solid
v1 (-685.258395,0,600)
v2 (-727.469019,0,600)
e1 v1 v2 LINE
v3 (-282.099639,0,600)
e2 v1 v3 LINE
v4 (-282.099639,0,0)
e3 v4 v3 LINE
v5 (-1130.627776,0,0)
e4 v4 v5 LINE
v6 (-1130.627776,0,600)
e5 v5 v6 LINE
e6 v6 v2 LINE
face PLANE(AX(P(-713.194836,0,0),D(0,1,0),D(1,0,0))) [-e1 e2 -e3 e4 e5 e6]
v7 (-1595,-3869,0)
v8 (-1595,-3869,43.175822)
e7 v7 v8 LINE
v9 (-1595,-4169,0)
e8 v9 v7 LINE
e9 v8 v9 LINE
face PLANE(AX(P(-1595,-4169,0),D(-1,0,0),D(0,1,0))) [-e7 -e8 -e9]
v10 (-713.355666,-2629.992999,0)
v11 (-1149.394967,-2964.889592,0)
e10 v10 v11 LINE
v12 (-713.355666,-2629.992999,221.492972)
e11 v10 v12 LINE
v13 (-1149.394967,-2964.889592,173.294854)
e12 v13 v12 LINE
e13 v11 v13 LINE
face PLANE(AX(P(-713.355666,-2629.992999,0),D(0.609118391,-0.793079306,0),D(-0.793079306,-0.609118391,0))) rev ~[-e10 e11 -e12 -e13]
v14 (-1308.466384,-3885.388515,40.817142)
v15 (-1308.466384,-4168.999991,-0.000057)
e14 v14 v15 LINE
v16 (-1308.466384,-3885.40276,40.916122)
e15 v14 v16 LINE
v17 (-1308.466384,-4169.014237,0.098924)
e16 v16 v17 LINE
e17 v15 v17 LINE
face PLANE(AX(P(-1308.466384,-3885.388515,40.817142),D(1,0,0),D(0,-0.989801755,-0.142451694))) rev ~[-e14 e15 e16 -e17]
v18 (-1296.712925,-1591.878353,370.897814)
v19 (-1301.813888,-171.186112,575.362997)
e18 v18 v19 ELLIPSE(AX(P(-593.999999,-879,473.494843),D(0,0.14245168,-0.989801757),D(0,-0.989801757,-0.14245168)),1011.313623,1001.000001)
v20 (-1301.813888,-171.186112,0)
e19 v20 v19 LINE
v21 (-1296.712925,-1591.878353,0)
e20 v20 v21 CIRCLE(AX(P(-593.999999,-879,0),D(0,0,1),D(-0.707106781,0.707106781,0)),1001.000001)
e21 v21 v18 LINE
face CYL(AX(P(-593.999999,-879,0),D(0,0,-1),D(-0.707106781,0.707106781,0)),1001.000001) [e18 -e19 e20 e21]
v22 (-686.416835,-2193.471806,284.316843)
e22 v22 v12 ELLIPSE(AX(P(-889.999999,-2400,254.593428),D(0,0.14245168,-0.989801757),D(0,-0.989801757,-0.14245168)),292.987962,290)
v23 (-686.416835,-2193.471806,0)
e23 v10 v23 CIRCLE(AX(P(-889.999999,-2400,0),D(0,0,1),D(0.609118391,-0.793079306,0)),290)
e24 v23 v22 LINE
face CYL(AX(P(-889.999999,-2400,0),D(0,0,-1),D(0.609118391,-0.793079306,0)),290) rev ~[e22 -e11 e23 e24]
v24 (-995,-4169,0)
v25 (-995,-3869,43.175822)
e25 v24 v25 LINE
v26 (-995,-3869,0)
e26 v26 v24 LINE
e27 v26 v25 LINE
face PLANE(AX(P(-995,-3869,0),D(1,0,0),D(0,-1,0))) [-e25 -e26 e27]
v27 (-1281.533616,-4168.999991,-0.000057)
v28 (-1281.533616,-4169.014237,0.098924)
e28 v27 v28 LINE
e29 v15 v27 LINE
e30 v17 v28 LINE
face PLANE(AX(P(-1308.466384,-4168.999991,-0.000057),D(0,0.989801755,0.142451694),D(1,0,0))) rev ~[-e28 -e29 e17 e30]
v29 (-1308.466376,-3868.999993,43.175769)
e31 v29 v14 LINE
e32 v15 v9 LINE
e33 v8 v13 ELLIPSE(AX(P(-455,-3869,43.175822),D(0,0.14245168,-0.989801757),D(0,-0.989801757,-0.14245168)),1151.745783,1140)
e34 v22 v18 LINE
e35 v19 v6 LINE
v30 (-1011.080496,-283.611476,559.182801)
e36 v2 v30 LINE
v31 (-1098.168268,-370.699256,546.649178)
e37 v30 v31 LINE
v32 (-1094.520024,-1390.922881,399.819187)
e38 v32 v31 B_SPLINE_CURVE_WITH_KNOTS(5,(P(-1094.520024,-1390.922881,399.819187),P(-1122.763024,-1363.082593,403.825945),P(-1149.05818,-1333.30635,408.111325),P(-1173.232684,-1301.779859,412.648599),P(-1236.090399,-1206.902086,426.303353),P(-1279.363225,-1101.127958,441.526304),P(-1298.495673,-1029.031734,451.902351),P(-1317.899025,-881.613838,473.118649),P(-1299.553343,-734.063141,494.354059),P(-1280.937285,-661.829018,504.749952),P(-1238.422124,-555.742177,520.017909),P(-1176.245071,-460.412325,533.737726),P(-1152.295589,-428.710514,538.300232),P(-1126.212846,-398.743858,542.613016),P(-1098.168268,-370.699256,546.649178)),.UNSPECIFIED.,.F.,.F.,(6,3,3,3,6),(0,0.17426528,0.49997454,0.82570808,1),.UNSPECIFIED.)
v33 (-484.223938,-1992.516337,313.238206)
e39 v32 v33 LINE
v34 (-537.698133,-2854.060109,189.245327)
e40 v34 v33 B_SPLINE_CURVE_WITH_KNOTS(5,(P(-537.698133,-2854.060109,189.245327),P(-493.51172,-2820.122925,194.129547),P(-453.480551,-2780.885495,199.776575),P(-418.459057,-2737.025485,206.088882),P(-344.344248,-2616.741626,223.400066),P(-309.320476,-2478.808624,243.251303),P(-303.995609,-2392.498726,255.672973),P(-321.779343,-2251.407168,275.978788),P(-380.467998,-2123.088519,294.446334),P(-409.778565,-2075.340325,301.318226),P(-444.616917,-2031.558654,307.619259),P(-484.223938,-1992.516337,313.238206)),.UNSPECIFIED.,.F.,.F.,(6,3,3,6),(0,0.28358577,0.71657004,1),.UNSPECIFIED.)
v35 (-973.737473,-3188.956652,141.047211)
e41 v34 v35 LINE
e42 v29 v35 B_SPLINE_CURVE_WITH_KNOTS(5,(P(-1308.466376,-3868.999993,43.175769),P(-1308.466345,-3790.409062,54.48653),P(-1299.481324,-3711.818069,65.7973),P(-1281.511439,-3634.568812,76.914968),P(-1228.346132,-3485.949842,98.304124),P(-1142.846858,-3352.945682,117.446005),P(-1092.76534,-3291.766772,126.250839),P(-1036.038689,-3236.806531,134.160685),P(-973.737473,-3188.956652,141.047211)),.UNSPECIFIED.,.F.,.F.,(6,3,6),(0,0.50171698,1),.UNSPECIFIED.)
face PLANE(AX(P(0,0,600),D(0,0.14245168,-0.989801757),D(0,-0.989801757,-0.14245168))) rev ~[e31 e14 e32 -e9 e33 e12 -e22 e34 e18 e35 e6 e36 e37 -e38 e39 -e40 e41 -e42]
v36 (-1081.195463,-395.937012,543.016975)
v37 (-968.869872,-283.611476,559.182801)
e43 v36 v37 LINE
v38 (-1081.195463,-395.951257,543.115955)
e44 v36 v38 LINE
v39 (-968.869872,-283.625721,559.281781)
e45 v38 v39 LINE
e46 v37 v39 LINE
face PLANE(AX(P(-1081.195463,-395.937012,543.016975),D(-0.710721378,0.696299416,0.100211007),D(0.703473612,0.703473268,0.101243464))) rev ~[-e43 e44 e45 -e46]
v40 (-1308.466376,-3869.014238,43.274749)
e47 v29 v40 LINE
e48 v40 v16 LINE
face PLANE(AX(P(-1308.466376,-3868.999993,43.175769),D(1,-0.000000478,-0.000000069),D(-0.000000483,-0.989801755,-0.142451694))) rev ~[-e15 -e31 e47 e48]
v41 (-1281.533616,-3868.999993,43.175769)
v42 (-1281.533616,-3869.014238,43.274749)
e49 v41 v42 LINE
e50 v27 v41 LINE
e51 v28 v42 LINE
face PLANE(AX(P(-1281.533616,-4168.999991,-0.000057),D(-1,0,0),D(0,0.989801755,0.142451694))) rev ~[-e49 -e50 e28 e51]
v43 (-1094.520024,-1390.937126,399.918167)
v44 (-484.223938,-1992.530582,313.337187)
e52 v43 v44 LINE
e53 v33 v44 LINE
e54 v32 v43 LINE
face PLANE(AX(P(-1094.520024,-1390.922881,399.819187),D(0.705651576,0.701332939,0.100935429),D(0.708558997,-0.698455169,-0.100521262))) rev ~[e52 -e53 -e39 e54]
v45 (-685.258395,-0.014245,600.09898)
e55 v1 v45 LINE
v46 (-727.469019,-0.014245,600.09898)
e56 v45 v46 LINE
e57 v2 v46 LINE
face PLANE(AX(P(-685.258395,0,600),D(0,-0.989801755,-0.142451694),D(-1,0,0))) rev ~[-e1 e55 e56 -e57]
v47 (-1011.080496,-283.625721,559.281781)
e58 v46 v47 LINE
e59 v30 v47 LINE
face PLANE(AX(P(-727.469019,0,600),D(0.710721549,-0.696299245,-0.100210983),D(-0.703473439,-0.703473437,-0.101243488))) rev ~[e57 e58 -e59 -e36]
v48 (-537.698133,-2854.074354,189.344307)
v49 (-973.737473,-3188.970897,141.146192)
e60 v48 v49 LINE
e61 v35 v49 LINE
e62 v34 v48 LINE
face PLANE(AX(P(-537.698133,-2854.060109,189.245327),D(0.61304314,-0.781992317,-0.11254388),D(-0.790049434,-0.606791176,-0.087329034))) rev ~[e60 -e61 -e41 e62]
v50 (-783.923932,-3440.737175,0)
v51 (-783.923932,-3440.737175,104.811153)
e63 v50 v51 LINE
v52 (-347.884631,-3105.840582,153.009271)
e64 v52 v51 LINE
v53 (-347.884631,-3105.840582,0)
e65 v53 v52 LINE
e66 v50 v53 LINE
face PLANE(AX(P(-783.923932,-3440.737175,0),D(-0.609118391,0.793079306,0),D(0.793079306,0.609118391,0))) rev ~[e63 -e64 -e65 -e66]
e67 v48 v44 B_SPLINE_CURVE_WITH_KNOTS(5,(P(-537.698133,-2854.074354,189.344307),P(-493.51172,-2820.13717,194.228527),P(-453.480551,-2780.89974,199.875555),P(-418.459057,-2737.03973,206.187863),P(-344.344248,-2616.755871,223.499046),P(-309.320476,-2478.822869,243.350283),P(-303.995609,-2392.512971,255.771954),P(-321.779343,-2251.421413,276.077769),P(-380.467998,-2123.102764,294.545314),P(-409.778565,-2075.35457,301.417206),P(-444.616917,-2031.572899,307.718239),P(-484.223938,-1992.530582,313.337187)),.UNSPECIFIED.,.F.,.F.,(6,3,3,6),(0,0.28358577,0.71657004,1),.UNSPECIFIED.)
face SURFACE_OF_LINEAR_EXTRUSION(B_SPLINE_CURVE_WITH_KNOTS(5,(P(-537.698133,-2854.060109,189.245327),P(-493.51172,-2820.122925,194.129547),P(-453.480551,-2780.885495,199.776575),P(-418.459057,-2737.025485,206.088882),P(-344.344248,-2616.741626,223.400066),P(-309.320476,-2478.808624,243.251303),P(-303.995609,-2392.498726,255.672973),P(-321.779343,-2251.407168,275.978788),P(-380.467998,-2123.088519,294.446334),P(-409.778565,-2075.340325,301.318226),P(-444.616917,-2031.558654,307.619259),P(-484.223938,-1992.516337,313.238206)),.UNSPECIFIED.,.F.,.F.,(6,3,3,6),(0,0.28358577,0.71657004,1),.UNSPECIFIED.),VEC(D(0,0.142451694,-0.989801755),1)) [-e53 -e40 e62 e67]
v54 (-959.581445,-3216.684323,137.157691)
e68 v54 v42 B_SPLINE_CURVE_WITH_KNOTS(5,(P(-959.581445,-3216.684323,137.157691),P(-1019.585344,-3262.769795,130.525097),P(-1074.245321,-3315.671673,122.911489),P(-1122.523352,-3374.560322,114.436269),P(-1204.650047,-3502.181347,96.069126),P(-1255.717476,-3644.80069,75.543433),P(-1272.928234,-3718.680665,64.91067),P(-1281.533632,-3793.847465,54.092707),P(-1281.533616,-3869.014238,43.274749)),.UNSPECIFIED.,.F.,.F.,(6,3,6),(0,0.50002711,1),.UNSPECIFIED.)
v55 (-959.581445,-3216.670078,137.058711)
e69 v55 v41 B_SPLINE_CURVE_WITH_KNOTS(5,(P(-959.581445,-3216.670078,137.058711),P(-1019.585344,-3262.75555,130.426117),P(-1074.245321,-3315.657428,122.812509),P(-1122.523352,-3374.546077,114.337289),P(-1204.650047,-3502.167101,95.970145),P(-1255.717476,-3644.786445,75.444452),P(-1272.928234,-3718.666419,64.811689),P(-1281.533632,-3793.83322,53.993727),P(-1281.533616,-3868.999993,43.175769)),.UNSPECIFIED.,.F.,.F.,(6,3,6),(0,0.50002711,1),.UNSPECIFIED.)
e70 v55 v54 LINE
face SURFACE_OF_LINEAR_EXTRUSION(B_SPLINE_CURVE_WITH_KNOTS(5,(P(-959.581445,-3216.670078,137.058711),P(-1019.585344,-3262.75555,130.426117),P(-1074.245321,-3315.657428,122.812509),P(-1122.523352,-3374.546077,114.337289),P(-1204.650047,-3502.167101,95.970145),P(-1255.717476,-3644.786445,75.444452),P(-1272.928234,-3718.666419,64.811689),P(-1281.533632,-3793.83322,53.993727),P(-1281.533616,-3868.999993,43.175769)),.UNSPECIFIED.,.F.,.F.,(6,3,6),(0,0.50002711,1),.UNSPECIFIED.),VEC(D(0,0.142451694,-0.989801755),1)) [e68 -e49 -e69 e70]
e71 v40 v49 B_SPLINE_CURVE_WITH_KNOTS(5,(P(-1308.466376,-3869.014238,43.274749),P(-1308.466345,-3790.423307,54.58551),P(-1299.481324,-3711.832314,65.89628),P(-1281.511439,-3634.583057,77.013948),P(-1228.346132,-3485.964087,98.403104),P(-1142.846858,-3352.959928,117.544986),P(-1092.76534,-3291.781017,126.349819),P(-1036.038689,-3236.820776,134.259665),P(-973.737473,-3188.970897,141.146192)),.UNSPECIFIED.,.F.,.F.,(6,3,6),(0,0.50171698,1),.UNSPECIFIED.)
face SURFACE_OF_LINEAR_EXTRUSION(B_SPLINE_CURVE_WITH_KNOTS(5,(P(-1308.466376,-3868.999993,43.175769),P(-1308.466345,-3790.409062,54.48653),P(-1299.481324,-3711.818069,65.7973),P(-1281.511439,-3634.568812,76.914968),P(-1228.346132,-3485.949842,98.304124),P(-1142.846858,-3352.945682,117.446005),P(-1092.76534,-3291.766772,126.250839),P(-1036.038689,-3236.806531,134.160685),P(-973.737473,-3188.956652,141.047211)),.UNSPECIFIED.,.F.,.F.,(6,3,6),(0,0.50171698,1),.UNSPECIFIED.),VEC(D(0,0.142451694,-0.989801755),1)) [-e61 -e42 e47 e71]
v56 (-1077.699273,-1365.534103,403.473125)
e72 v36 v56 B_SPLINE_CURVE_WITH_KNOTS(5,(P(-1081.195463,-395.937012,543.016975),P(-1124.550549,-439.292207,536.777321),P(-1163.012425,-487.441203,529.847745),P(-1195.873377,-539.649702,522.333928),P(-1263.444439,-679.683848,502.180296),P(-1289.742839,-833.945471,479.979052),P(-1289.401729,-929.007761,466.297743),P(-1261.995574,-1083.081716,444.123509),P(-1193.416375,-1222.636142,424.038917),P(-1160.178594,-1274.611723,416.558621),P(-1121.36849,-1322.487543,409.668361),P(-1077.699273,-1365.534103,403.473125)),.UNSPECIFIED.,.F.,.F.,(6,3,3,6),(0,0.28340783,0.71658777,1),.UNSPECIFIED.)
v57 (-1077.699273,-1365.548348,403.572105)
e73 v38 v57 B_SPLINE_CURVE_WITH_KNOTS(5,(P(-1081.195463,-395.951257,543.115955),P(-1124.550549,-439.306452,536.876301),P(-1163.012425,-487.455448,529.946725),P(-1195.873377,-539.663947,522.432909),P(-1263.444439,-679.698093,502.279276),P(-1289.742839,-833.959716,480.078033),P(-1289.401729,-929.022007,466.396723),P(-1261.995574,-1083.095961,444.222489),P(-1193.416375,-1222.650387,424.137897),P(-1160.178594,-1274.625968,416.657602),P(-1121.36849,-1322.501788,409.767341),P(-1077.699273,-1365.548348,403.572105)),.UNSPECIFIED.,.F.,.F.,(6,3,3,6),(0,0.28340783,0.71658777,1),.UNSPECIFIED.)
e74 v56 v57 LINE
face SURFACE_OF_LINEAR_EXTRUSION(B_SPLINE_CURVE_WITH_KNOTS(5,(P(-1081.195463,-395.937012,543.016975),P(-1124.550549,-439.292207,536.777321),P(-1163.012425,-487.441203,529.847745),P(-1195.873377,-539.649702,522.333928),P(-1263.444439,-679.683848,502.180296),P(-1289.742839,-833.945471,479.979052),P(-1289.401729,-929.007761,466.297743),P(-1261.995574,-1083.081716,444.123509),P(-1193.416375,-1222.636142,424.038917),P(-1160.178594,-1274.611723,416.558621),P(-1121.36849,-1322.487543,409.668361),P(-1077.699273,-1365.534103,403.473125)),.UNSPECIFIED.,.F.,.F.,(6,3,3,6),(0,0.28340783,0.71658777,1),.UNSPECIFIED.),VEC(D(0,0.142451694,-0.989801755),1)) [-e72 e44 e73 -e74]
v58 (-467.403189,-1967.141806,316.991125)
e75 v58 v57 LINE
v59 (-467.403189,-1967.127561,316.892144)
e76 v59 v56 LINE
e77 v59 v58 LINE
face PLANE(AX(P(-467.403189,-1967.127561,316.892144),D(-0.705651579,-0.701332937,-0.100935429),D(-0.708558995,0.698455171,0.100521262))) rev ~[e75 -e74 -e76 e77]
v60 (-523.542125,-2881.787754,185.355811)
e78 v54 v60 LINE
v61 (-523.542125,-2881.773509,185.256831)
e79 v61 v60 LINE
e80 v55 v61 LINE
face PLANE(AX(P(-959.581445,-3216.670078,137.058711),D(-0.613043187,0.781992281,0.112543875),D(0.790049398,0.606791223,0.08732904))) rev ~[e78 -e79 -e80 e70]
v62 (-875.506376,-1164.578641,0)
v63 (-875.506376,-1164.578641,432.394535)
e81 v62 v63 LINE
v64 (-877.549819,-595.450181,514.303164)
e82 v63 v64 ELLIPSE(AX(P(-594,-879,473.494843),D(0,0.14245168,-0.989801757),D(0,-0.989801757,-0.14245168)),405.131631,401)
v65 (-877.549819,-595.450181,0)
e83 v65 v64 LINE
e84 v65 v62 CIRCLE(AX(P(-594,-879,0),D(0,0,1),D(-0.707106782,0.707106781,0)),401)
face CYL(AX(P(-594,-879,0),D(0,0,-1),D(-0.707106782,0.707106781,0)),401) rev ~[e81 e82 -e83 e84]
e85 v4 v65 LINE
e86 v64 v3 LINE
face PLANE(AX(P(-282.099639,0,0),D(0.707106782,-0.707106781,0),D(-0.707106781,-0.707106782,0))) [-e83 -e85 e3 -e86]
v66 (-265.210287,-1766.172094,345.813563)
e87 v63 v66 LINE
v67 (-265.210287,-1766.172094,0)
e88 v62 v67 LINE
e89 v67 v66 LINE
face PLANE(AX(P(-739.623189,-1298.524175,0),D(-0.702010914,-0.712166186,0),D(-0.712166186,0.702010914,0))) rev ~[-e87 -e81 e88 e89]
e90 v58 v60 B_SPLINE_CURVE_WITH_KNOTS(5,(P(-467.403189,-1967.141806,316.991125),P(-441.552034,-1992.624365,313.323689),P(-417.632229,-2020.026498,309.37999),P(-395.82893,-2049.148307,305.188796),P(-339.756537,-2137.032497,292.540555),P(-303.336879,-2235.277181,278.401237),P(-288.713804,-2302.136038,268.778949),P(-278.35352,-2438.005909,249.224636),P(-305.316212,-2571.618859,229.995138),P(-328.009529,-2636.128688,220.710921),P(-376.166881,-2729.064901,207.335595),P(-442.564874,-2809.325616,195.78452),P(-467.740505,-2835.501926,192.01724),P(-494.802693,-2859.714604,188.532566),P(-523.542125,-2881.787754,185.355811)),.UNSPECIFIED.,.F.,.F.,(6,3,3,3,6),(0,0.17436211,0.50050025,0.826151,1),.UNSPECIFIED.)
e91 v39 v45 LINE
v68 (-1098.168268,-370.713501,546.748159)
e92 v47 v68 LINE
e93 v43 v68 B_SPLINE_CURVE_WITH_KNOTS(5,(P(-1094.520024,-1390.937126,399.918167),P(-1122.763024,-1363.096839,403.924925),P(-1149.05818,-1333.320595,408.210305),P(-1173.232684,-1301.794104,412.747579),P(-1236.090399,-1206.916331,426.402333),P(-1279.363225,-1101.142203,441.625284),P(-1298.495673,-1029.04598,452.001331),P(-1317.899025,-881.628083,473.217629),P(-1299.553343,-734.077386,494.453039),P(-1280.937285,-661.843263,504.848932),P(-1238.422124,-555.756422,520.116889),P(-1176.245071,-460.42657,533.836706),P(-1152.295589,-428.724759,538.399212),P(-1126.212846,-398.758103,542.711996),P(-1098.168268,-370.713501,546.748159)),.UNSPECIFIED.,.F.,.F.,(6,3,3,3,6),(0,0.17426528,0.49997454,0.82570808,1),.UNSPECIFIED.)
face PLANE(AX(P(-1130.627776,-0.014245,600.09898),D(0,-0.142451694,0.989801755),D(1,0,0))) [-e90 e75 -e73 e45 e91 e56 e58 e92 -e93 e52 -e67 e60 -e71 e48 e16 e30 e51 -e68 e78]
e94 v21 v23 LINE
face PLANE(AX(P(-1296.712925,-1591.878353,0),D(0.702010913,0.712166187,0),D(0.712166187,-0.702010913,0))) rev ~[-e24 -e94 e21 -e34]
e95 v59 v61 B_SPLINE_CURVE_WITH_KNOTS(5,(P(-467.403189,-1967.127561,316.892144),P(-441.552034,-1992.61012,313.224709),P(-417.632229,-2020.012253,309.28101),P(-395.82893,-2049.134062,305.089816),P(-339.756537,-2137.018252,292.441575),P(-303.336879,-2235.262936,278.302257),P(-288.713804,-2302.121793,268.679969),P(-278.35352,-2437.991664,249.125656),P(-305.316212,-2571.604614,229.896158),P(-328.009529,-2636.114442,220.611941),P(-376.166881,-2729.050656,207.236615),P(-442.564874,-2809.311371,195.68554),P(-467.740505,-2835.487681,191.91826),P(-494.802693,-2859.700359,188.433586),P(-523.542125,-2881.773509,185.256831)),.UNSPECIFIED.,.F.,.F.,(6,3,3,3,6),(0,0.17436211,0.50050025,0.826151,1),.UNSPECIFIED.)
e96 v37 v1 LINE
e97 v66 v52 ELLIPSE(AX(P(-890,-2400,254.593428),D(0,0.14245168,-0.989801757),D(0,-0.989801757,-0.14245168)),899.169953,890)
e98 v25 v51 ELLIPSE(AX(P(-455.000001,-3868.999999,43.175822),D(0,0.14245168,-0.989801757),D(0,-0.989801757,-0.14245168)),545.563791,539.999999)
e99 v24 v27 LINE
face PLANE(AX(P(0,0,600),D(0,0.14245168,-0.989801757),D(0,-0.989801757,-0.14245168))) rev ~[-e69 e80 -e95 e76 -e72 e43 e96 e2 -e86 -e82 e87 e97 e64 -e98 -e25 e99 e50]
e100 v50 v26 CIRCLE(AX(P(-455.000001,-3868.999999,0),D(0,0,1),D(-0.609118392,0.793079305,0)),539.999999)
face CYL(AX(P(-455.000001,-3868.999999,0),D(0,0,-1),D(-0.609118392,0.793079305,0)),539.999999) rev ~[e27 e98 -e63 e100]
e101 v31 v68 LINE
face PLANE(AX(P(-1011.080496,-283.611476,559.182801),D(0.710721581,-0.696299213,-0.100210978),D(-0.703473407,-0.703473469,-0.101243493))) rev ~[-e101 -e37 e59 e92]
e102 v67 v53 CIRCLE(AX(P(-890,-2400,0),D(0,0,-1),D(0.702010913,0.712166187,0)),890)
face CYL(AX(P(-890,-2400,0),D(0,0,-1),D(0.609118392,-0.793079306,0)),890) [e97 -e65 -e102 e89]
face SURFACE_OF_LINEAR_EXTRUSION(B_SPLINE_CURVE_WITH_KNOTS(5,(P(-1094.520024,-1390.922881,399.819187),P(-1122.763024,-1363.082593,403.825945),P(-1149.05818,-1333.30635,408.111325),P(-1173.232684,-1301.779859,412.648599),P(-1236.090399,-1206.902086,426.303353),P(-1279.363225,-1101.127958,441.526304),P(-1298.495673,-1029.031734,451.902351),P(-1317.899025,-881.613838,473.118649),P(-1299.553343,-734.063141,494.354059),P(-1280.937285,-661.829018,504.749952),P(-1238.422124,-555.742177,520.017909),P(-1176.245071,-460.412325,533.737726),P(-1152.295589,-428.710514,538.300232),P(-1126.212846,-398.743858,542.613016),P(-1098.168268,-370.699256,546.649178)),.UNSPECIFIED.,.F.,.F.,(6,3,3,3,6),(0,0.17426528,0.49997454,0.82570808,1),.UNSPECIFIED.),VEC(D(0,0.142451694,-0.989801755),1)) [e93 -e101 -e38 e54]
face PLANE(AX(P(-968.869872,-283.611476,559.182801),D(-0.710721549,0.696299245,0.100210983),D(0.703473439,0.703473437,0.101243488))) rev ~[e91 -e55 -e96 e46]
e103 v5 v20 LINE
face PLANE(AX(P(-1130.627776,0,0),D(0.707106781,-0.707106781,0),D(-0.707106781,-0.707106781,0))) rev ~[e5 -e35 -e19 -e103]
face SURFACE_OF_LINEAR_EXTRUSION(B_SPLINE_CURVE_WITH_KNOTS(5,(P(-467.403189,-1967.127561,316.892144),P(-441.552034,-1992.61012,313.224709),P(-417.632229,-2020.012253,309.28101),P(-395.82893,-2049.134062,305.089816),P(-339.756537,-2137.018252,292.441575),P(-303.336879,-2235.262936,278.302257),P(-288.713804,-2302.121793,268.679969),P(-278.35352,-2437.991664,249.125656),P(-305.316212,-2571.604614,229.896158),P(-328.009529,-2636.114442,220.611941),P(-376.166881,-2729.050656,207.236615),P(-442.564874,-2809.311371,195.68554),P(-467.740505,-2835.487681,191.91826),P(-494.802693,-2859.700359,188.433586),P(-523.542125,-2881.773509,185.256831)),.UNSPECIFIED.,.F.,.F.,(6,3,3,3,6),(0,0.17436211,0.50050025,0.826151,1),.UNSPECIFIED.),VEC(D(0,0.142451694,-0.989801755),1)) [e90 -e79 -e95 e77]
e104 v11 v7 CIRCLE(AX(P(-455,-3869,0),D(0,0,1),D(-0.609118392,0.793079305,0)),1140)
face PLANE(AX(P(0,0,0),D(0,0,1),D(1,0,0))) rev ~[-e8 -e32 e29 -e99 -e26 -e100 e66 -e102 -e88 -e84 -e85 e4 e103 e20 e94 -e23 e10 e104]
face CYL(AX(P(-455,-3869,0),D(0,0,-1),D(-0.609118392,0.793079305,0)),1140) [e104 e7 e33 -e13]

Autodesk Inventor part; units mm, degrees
ref_plane "YZ Plane" through (0, 0, 0) normal (1, 0, 0) x (0, 1, 0)
ref_plane "XZ Plane" through (0, 0, 0) normal (0, 1, 0) x (-1, 0, 0)
ref_plane "XY Plane" through (0, 0, 0) normal (0, 0, 1) x (1, 0, 0)
sketch "スケッチ1" plane through (0, 0, 0) normal (0, 0, 1) x (1, 0, 0)
  line L0 (1130.627776, 0) -> (1301.813888, -171.186112)
  line L1 (282.099639, 0) -> (877.549819, -595.450181)
  line L2 (1130.627776, 0) -> (282.099639, 0)
  circle A0 centre (594, -879) radius 1001 construction
  arc A1 (1296.712925, -1591.878353) -> (1296.712925, -1591.878353) centre (389.934597, -671.982591) ccw
  line L3 (1296.712925, -1591.878353) -> (686.416835, -2193.471806)
  circle A2 centre (890, -2400) radius 290 construction
  line L4 (713.355666, -2629.992999) -> (1149.394967, -2964.889592)
  line L5 (1595, -4169) -> (1595, -3869)
  circle A3 centre (455, -3869) radius 1140 construction
  arc A4 (875.506376, -1164.578641) -> (877.549819, -595.450181) centre (594, -879) ccw construction
  circle A5 centre (890, -2400) radius 890 construction
  circle A6 centre (455, -3869) radius 540 construction
  line L6 (783.923932, -3440.737175) -> (347.884631, -3105.840582)
  line L7 (265.210287, -1766.172094) -> (875.506376, -1164.578641)
  line L8 (995, -3869) -> (995, -4169)
  line L9 (995, -4169) -> (1595, -4169)
  arc A7 (1296.712925, -1591.878353) -> (1301.813888, -171.186112) centre (594, -879) ccw
  arc A8 (265.210287, -1766.172094) -> (347.884631, -3105.840582) centre (890, -2400) ccw
  arc A9 (686.416835, -2193.471806) -> (713.355666, -2629.992999) centre (890, -2400) ccw
  arc A10 (875.506376, -1164.578641) -> (877.549819, -595.450181) centre (594, -879) ccw
  arc A11 (995, -3869) -> (783.923932, -3440.737175) centre (455, -3869) ccw
  arc A12 (1595, -3869) -> (1149.394967, -2964.889592) centre (455, -3869) ccw
  line L10 (0, -4169) -> (1595, -4169) construction
  line L11 (1595, -4169) -> (1595, -4131.300846) construction
  line L12 (0, -4169) -> (0, 0) construction
  line L13 (0, 0) -> (1595, 0) construction
  line L14 (-1130.627776, 0) -> (-1301.813888, -171.186112)
  line L15 (-282.099639, 0) -> (-877.549819, -595.450181)
  line L16 (-1130.627776, 0) -> (-282.099639, 0)
  arc A13 (-1296.712925, -1591.878353) -> (-1296.712925, -1591.878353) centre (-389.934597, -671.982591) ccw
  line L17 (-1296.712925, -1591.878353) -> (-686.416835, -2193.471806)
  line L18 (-713.355666, -2629.992999) -> (-1149.394967, -2964.889592)
  line L19 (-1595, -4169) -> (-1595, -3869)
  line L20 (-783.923932, -3440.737175) -> (-347.884631, -3105.840582)
  line L21 (-265.210287, -1766.172094) -> (-875.506376, -1164.578641)
  line L22 (-995, -3869) -> (-995, -4169)
  line L23 (-995, -4169) -> (-1595, -4169)
  arc A14 (-1301.813888, -171.186112) -> (-1296.712925, -1591.878353) centre (-594, -879) ccw
  arc A15 (-347.884631, -3105.840582) -> (-265.210287, -1766.172094) centre (-890, -2400) ccw
  arc A16 (-713.355666, -2629.992999) -> (-686.416835, -2193.471806) centre (-890, -2400) ccw
  arc A17 (-877.549819, -595.450181) -> (-875.506376, -1164.578641) centre (-594, -879) ccw
  arc A18 (-783.923932, -3440.737175) -> (-995, -3869) centre (-455, -3869) ccw
  arc A19 (-1149.394967, -2964.889592) -> (-1595, -3869) centre (-455, -3869) ccw
  line L24 (0, -4169) -> (-1595, -4169) construction
  line L25 (-1595, -4169) -> (-1595, -4131.300846) construction
  line L26 (1595, -4169) -> (1595, 0) construction
  arc A20 (1120.235186, -2943.223489) -> (532.764288, -2869.555797) centre (890, -2400) ccw
  arc A21 (1086.10965, -1378.228497) -> (1089.681854, -383.318146) centre (594, -879) ccw
  line L27 (332.920262, 373.443445) -> (1089.681854, -383.318146)
  line L28 (475.813561, -1979.82195) -> (1086.10965, -1378.228497)
  arc A22 (1295, -3933.855609) -> (965.120487, -3198.490239) centre (455, -3869) ccw
  line L29 (1295, -4169) -> (1295, -3933.855609)
  line L30 (965.120487, -3198.490239) -> (532.764288, -2869.555797)
  dimension "d1" = 1080
  dimension "d2" = 2280
  dimension "d3" = 580
  dimension "d4" = 1780
  dimension "d5" = 802
  dimension "d6" = 2002
  dimension "d16" = 45
  dimension "d19" = 1140
  dimension "d20" = 4169
  dimension "d21" = 0
  dimension "d22" = 600
  dimension "d35" = 3290
  dimension "d36" = 1769
  dimension "d37" = 300
  dimension "d39" = 300
  dimension "d41" = 1595
  dimension "d43" = 1001
  dimension "d55" = 1180
  dimension "d58" = 1402
  dimension "d59" = 300
  dimension "d60" = 1685
  dimension "d61" = 300
extrude "押し出し1" add sketch "スケッチ1" along normal blind 600 contours L16 L15 A17 A1 | A1 A17 L21 A15 A13 A14 L14 L16 | A13 A15 L20 A18 L22 L23 L19 A19 L18 A16 L17 | L21 A15 A1
sketch "スケッチ2" plane through (0, 0, 0) normal (1, 0, 0) x (0, 1, 0)
  line L0 (0, 0) -> (0, 600)
  line L1 (0, 600) -> (-4169, 0)
  line L2 (-4169, 0) -> (0, 0)
  dimension "d26" = 600
  dimension "d27" = 4169
extrude "押し出し2" cut sketch "スケッチ2" along normal through all both and the other way through all keep common part
sketch "スケッチ3" plane through (-1130.627776, 0, 600) normal (0, -0.1424517, 0.9898018) x (1, 0, 0)
  line L0 (0, 0) -> (-171.186112, -172.949897)
  ellipse E0 centre (536.627776, -888.056617) end of major axis (536.627776, 123.257005) minor radius 1001 (-171.186112, -172.949897) -> (-166.085149, -1608.279982) ccw
  line L1 (-166.085149, -1608.279982) -> (444.210941, -2216.071844)
  ellipse E1 centre (240.627776, -2424.727964) end of major axis (240.627776, -2131.740002) minor radius 290 (417.27211, -2657.090654) -> (444.210941, -2216.071844) ccw
  line L2 (417.27211, -2657.090654) -> (-18.767191, -2995.437793)
  ellipse E2 centre (675.627776, -3908.863539) end of major axis (675.627776, -2757.117756) minor radius 1140 (-18.767191, -2995.437793) -> (-464.372224, -3908.863539) ccw
  line L3 (-464.372224, -3908.863539) -> (-464.372224, -4211.954534)
  line L4 (-464.372224, -4211.954534) -> (135.627776, -4211.954534)
  line L5 (135.627776, -4211.954534) -> (135.627776, -3908.863539)
  ellipse E3 centre (675.627776, -3908.863539) end of major axis (675.627776, -4454.427331) minor radius 540 (346.703844, -3476.188186) -> (135.627776, -3908.863539) ccw
  line L6 (346.703844, -3476.188186) -> (782.743145, -3137.841046)
  ellipse E4 centre (240.627776, -2424.727964) end of major axis (240.627776, -3323.897918) minor radius 890 (782.743145, -3137.841046) -> (865.417489, -1784.369528) ccw
  line L7 (865.417489, -1784.369528) -> (255.1214, -1176.577665)
  ellipse E5 centre (536.627776, -888.056617) end of major axis (536.627776, -1293.188248) minor radius 401 (253.077957, -601.585294) -> (255.1214, -1176.577665) ccw
  line L8 (253.077957, -601.585294) -> (848.528137, 0)
  line L9 (848.528137, 0) -> (0, 0)
  line L10 (32.459504, -374.518685) -> (119.54728, -286.533616)
  line L11 (119.54728, -286.533616) -> (161.757904, -286.533616)
  line L12 (161.757904, -286.533616) -> (49.432341, -400.016505)
  line L13 (52.928503, -1379.603638) -> (663.224592, -1987.395501)
  line L14 (607.085651, -2911.465345) -> (171.04635, -3249.812485)
  line L15 (-150.90584, -3908.863539) -> (-150.90584, -3925.420918)
  line L16 (-150.90584, -3925.420918) -> (-177.838608, -3925.420918)
  line L17 (-177.838608, -3925.420918) -> (-177.838608, -3908.863539)
  line L18 (156.890303, -3221.813494) -> (592.929604, -2883.466355)
  line L19 (646.403838, -2013.045871) -> (36.107748, -1405.254009)
  line L20 (-177.838608, -3925.420918) -> (-177.838608, -4211.954534)
  line L21 (-150.90584, -3925.420918) -> (-150.90584, -4211.954534)
  line L22 (119.54728, -286.533616) -> (403.158757, 0)
  line L23 (161.757904, -286.533616) -> (445.369381, 0)
  line L24 (135.627776, -4196.954534) -> (-464.372224, -4196.954534)
  circle A0 centre (536.627776, -888.056617) radius 687.533623
  circle A1 centre (536.627776, -888.056617) radius 714.466404
  circle A2 centre (536.627776, -888.056617) radius 702.533623
  line L25 (536.627776, -888.056617) -> (-165.905847, -888.056617)
  spline S0 degree 5 poles (49.432313, -400.016478) (6.077227, -443.818375) (-32.384649, -492.463466) (-65.245601, -545.209886) (-132.816663, -686.686848) (-159.115063, -842.537878) (-158.773953, -938.579626) (-131.367798, -1094.241054) (-62.788599, -1235.233354) (-29.550818, -1287.744456) (9.259286, -1336.113556) (52.928475, -1379.603666) knots 0 0 0 0 0 0 0.28340783 0.28340783 0.28340783 0.71658777 0.71658777 0.71658777 1 1 1 1 1 1
  spline S1 degree 5 poles (663.224587, -1987.395506) (689.075742, -2013.14062) (712.995547, -2040.825086) (734.798846, -2070.246947) (790.871239, -2159.036636) (827.290897, -2258.293566) (841.913972, -2325.841291) (852.274256, -2463.111073) (825.311564, -2598.10068) (802.618247, -2663.275174) (754.460895, -2757.168939) (688.062902, -2838.256606) (662.887271, -2864.702619) (635.825083, -2889.164768) (607.085644, -2911.465337) knots 0 0 0 0 0 0 0.17436211 0.17436211 0.17436211 0.50050025 0.50050025 0.50050025 0.826151 0.826151 0.826151 1 1 1 1 1 1
  spline S2 degree 5 poles (171.046331, -3249.81246) (111.042432, -3296.372766) (56.382455, -3349.819709) (8.104424, -3409.315106) (-74.022271, -3538.251051) (-125.0897, -3682.339847) (-142.300458, -3756.981031) (-150.905856, -3832.922299) (-150.905852, -3908.863539) knots 0 0 0 0 0 0 0.50002711 0.50002711 0.50002711 1 1 1 1 1 1
  spline S3 degree 5 poles (-177.8386, -3908.863539) (-177.838569, -3829.462861) (-168.853548, -3750.06212) (-150.883663, -3672.016939) (-97.718356, -3521.8667) (-12.219082, -3387.492156) (37.862436, -3325.6829) (94.589087, -3270.156386) (156.890287, -3221.813474) knots 0 0 0 0 0 0 0.50171698 0.50171698 0.50171698 1 1 1 1 1 1
  spline S4 degree 5 poles (592.929643, -2883.466405) (637.116056, -2849.179555) (677.147225, -2809.537849) (712.168719, -2765.225935) (786.283528, -2643.702753) (821.3073, -2504.348583) (826.632167, -2417.149407) (808.848433, -2274.604137) (750.159778, -2144.96338) (720.849211, -2096.723221) (686.010859, -2052.490454) (646.403872, -2013.045836) knots 0 0 0 0 0 0 0.28358577 0.28358577 0.28358577 0.71657004 0.71657004 0.71657004 1 1 1 1 1 1
  spline S5 degree 5 poles (36.107752, -1405.254005) (7.864752, -1377.12687) (-18.430404, -1347.043832) (-42.604908, -1315.192514) (-105.462623, -1219.337185) (-148.735449, -1112.473232) (-167.867897, -1039.634178) (-187.271249, -890.697388) (-168.925567, -741.626429) (-150.309509, -668.648054) (-107.794348, -561.468167) (-45.617295, -465.156101) (-21.667813, -433.127656) (4.41493, -402.852244) (32.459508, -374.518689) knots 0 0 0 0 0 0 0.17426528 0.17426528 0.17426528 0.49997454 0.49997454 0.49997454 0.82570808 0.82570808 0.82570808 1 1 1 1 1 1
  point P0 (1130.627776, -85.471008)
  dimension "d31" = 30
  dimension "d32" = 15
  dimension "d62" = 1428.93281
  dimension "d63" = 15
sketch "スケッチ3 outline for 押し出し3" plane through (-1130.627776, 0, 600) normal (0, -0.1424517, 0.9898018) x (1, 0, 0)
  line L0 (403.158757, 0) -> (119.54728, -286.533616)
  line L1 (119.54728, -286.533616) -> (32.459508, -374.518689)
  spline S0 degree 5 poles (36.107752, -1405.254005) (7.864752, -1377.12687) (-18.430404, -1347.043832) (-42.604908, -1315.192514) (-105.462623, -1219.337185) (-148.735449, -1112.473232) (-167.867897, -1039.634178) (-187.271249, -890.697388) (-168.925567, -741.626429) (-150.309509, -668.648054) (-107.794348, -561.468167) (-45.617295, -465.156101) (-21.667813, -433.127656) (4.41493, -402.852244) (32.459508, -374.518689) knots 0 0 0 0 0 0 0.17426528 0.17426528 0.17426528 0.49997454 0.49997454 0.49997454 0.82570808 0.82570808 0.82570808 1 1 1 1 1 1
  line L2 (36.107752, -1405.254005) -> (646.403838, -2013.045871)
  spline S1 degree 5 poles (592.929643, -2883.466405) (637.116056, -2849.179555) (677.147225, -2809.537849) (712.168719, -2765.225935) (786.283528, -2643.702753) (821.3073, -2504.348583) (826.632167, -2417.149407) (808.848433, -2274.604137) (750.159778, -2144.96338) (720.849211, -2096.723221) (686.010859, -2052.490454) (646.403838, -2013.045871) knots 0 0 0 0 0 0 0.28358577 0.28358577 0.28358577 0.71657004 0.71657004 0.71657004 1 1 1 1 1 1
  line L3 (592.929643, -2883.466405) -> (156.890303, -3221.813494)
  spline S2 degree 5 poles (-177.8386, -3908.863539) (-177.838569, -3829.462861) (-168.853548, -3750.06212) (-150.883663, -3672.016939) (-97.718356, -3521.8667) (-12.219082, -3387.492156) (37.862436, -3325.6829) (94.589087, -3270.156386) (156.890303, -3221.813494) knots 0 0 0 0 0 0 0.50171698 0.50171698 0.50171698 1 1 1 1 1 1
  line L4 (-177.8386, -3908.863539) -> (-177.838608, -3925.420918)
  line L5 (-177.838608, -3925.420918) -> (-177.838608, -4211.954534)
  line L6 (-177.838608, -4211.954534) -> (-150.90584, -4211.954534)
  line L7 (-150.90584, -4211.954534) -> (-150.90584, -3908.863539)
  spline S3 degree 5 poles (171.046331, -3249.81246) (111.042432, -3296.372766) (56.382455, -3349.819709) (8.104424, -3409.315106) (-74.022271, -3538.251051) (-125.0897, -3682.339847) (-142.300458, -3756.981031) (-150.905856, -3832.922299) (-150.90584, -3908.863539) knots 0 0 0 0 0 0 0.50002711 0.50002711 0.50002711 1 1 1 1 1 1
  line L8 (171.046331, -3249.81246) -> (607.085651, -2911.465345)
  spline S4 degree 5 poles (663.224587, -1987.395506) (689.075742, -2013.14062) (712.995547, -2040.825086) (734.798846, -2070.246947) (790.871239, -2159.036636) (827.290897, -2258.293566) (841.913972, -2325.841291) (852.274256, -2463.111073) (825.311564, -2598.10068) (802.618247, -2663.275174) (754.460895, -2757.168939) (688.062902, -2838.256606) (662.887271, -2864.702619) (635.825083, -2889.164768) (607.085651, -2911.465345) knots 0 0 0 0 0 0 0.17436211 0.17436211 0.17436211 0.50050025 0.50050025 0.50050025 0.826151 0.826151 0.826151 1 1 1 1 1 1
  line L9 (663.224587, -1987.395506) -> (52.928503, -1379.603638)
  spline S5 degree 5 poles (49.432313, -400.016478) (6.077227, -443.818375) (-32.384649, -492.463466) (-65.245601, -545.209886) (-132.816663, -686.686848) (-159.115063, -842.537878) (-158.773953, -938.579626) (-131.367798, -1094.241054) (-62.788599, -1235.233354) (-29.550818, -1287.744456) (9.259286, -1336.113556) (52.928503, -1379.603638) knots 0 0 0 0 0 0 0.28340783 0.28340783 0.28340783 0.71658777 0.71658777 0.71658777 1 1 1 1 1 1
  line L10 (49.432313, -400.016478) -> (161.757904, -286.533616)
  line L11 (161.757904, -286.533616) -> (445.369381, 0)
  line L12 (445.369381, 0) -> (403.158757, 0)
extrude "押し出し3" add sketch "スケッチ3 outline for 押し出し3" along normal blind 0.1
sketch "スケッチ5" plane through (0, 0, 0) normal (0, 0, 1) x (1, 0, 0)
  line L0 (-1308.466384, -3869.014245) -> (-1308.466384, -4169.014245)
  line L1 (-1308.466384, -4169.014245) -> (-1281.533616, -4169.014245)
  line L2 (-1281.533616, -4169.014245) -> (-1281.533616, -3869.014245)
  line L3 (-959.581426, -3216.684354) -> (-523.542125, -2881.78776)
  line L4 (-467.403184, -1967.141804) -> (-1077.699273, -1365.548351)
  line L5 (-1081.195435, -395.951285) -> (-685.258395, -0.014245)
  line L6 (-685.258395, -0.014245) -> (-727.469019, -0.014245)
  line L7 (-727.469019, -0.014245) -> (-1098.168272, -370.713498)
  line L8 (-1094.520028, -1390.937133) -> (-484.223938, -1992.530586)
  line L9 (-537.698172, -2854.07431) -> (-973.737473, -3188.970904)
  line L10 (-1081.195435, -395.951285) -> (-598.117629, -879.029091)
  line L11 (-598.117629, -879.029091) -> (-1077.699273, -1365.548351)
  line L12 (-598.117629, -879.029091) -> (-1281.52915, -881.482864)
  line L13 (-1281.52915, -881.482864) -> (-1308.461836, -881.579565)
  line L14 (-484.223938, -1992.530586) -> (-886.199659, -2400.321278)
  line L15 (-886.199659, -2400.321278) -> (-537.698172, -2854.07431)
  line L16 (-886.199659, -2400.321278) -> (-314.576724, -2435.597581)
  line L17 (-314.576724, -2435.597581) -> (-287.672956, -2437.257881)
  line L18 (-1281.533616, -3869.014245) -> (-458.564526, -3869.014245)
  line L19 (-458.564526, -3869.014245) -> (-959.581426, -3216.684354)
  line L20 (-458.564526, -3869.014245) -> (-1196.563908, -3505.279644)
  line L21 (-1196.563908, -3505.279644) -> (-1221.734569, -3492.873888)
  point P0 (0, 0)
  point P1 (-1294.995493, -881.531215)
  point P2 (-301.12484, -2436.427731)
  point P3 (-1209.149239, -3499.076766)
  point P4 (536.976093, 8076.719831)
  dimension "d44" = 669.93748
  dimension "d45" = 1732.58651
  dimension "d46" = 3287.48303
sketch "スケッチ6" plane through (0, 0, 0) normal (1, 0, 0) x (0, 1, 0)
  line L0 (-3869.014245, 43.274802) -> (-4169.014245, 0.09898)
  line L1 (-4169.014245, 0.09898) -> (-3869.014245, 43.274802)
  line L2 (-3869.014245, 43.274802) -> (-3216.684354, 137.157732)
  line L3 (-3216.684354, 137.157732) -> (-2881.78776, 185.35585)
  line L4 (-2881.78776, 185.35585) -> (-1967.141804, 316.991152)
  line L5 (-1967.141804, 316.991152) -> (-1365.548351, 403.572124)
  line L6 (-1365.548351, 403.572124) -> (-395.951285, 543.115957)
  line L7 (-395.951285, 543.115957) -> (-0.014245, 600.09898)
  line L8 (-0.014245, 600.09898) -> (-370.713498, 546.748164)
  line L9 (-370.713498, 546.748164) -> (-1390.937133, 399.918186)
  line L10 (-1390.937133, 399.918186) -> (-1992.530586, 313.337214)
  line L11 (-1992.530586, 313.337214) -> (-2854.07431, 189.344353)
  line L12 (-2854.07431, 189.344353) -> (-3188.970904, 141.146235)
  line L13 (-3188.970904, 141.146235) -> (-3869.014245, 43.274802)
  point P0 (0, 0)
  point P1 (-3499.076766, 96.515984)
  point P2 (-2436.427731, 249.451801)
  point P3 (-881.531215, 473.231582)
  dimension "d47" = 669.93748
  dimension "d48" = 1732.58651
  dimension "d49" = 3287.48303
  dimension "d50" = 96.417
  dimension "d51" = 249.35282
  dimension "d52" = 473.1326
sketch "スケッチ7" plane through (-1130.627776, -0.014245, 600.09898) normal (0, -0.1424517, 0.9898018) x (1, 0, 0)
  line L0 (-177.838608, -3908.863539) -> (-177.838608, -4211.954534)
  line L1 (-177.838608, -4211.954534) -> (-150.90584, -4211.954534)
  line L2 (-150.90584, -4211.954534) -> (-150.90584, -3908.863539)
  line L3 (171.04635, -3249.812485) -> (607.085651, -2911.465345)
  line L4 (663.224592, -1987.395501) -> (52.928503, -1379.603638)
  line L5 (49.432341, -400.016505) -> (445.369381, 0)
  line L6 (445.369381, 0) -> (403.158757, 0)
  line L7 (403.158757, 0) -> (32.459504, -374.518685)
  line L8 (36.107748, -1405.254009) -> (646.403838, -2013.045871)
  line L9 (592.929604, -2883.466355) -> (156.890303, -3221.813494)
  line L10 (-150.90584, -3908.863539) -> (-150.90584, -4211.954534)
  line L11 (-150.90584, -4211.954534) -> (135.627776, -4211.954534)
  line L12 (135.627776, -4211.954534) -> (135.627776, -3908.863539)
  ellipse E0 centre (675.627776, -3908.863539) end of major axis (675.627776, -4454.427331) minor radius 540 (346.703844, -3476.188186) -> (135.627776, -3908.863539) ccw
  line L13 (346.703844, -3476.188186) -> (782.743145, -3137.841046)
  ellipse E1 centre (240.627776, -2424.727964) end of major axis (240.627776, -3323.897918) minor radius 890 (782.743145, -3137.841046) -> (865.417489, -1784.369528) ccw
  line L14 (865.417489, -1784.369528) -> (255.1214, -1176.577665)
  ellipse E2 centre (536.627776, -888.056617) end of major axis (536.627776, -1293.188248) minor radius 401 (253.077957, -601.585294) -> (255.1214, -1176.577665) ccw
  line L15 (253.077957, -601.585294) -> (848.528137, 0)
  line L16 (848.528137, 0) -> (445.369381, 0)
  line L17 (445.369381, 0) -> (49.432341, -400.016505)
  line L18 (52.928503, -1379.603638) -> (663.224592, -1987.395501)
  line L19 (607.085651, -2911.465345) -> (171.04635, -3249.812485)
  line L20 (536.627776, -888.056617) -> (-363.574656, -888.056617)
  line L21 (240.627776, -2424.727964) -> (865.417489, -2424.727964)
  circle A0 centre (675.627776, -3908.863539) radius 842.5
  circle A1 centre (240.627776, -2424.727964) radius 590
  circle A2 centre (536.627776, -888.056617) radius 701
  line L22 (675.627776, -3908.863539) -> (-164.372224, -3844.00793)
  line L23 (675.627776, -3908.863539) -> (52.620076, -3341.706016)
  circle A3 centre (536.627776, -888.056617) radius 714.466403
  circle A4 centre (536.627776, -888.056617) radius 687.533623
  point P0 (1130.627776, -85.471008)
  point P1 (-164.372224, -888.056617)
  point P2 (830.627776, -2424.727964)
  point P3 (-164.372224, -888.056617)
  point P4 (830.627776, -2424.727964)
  dimension "d56" = 1180
  dimension "d57" = 1402
  dimension "d54" = 1685
equation "\"d47\" = d44"
equation "\"d48\" = d45"
equation "\"d49\" = d46"
properties part number "Down Hill_赤2"
